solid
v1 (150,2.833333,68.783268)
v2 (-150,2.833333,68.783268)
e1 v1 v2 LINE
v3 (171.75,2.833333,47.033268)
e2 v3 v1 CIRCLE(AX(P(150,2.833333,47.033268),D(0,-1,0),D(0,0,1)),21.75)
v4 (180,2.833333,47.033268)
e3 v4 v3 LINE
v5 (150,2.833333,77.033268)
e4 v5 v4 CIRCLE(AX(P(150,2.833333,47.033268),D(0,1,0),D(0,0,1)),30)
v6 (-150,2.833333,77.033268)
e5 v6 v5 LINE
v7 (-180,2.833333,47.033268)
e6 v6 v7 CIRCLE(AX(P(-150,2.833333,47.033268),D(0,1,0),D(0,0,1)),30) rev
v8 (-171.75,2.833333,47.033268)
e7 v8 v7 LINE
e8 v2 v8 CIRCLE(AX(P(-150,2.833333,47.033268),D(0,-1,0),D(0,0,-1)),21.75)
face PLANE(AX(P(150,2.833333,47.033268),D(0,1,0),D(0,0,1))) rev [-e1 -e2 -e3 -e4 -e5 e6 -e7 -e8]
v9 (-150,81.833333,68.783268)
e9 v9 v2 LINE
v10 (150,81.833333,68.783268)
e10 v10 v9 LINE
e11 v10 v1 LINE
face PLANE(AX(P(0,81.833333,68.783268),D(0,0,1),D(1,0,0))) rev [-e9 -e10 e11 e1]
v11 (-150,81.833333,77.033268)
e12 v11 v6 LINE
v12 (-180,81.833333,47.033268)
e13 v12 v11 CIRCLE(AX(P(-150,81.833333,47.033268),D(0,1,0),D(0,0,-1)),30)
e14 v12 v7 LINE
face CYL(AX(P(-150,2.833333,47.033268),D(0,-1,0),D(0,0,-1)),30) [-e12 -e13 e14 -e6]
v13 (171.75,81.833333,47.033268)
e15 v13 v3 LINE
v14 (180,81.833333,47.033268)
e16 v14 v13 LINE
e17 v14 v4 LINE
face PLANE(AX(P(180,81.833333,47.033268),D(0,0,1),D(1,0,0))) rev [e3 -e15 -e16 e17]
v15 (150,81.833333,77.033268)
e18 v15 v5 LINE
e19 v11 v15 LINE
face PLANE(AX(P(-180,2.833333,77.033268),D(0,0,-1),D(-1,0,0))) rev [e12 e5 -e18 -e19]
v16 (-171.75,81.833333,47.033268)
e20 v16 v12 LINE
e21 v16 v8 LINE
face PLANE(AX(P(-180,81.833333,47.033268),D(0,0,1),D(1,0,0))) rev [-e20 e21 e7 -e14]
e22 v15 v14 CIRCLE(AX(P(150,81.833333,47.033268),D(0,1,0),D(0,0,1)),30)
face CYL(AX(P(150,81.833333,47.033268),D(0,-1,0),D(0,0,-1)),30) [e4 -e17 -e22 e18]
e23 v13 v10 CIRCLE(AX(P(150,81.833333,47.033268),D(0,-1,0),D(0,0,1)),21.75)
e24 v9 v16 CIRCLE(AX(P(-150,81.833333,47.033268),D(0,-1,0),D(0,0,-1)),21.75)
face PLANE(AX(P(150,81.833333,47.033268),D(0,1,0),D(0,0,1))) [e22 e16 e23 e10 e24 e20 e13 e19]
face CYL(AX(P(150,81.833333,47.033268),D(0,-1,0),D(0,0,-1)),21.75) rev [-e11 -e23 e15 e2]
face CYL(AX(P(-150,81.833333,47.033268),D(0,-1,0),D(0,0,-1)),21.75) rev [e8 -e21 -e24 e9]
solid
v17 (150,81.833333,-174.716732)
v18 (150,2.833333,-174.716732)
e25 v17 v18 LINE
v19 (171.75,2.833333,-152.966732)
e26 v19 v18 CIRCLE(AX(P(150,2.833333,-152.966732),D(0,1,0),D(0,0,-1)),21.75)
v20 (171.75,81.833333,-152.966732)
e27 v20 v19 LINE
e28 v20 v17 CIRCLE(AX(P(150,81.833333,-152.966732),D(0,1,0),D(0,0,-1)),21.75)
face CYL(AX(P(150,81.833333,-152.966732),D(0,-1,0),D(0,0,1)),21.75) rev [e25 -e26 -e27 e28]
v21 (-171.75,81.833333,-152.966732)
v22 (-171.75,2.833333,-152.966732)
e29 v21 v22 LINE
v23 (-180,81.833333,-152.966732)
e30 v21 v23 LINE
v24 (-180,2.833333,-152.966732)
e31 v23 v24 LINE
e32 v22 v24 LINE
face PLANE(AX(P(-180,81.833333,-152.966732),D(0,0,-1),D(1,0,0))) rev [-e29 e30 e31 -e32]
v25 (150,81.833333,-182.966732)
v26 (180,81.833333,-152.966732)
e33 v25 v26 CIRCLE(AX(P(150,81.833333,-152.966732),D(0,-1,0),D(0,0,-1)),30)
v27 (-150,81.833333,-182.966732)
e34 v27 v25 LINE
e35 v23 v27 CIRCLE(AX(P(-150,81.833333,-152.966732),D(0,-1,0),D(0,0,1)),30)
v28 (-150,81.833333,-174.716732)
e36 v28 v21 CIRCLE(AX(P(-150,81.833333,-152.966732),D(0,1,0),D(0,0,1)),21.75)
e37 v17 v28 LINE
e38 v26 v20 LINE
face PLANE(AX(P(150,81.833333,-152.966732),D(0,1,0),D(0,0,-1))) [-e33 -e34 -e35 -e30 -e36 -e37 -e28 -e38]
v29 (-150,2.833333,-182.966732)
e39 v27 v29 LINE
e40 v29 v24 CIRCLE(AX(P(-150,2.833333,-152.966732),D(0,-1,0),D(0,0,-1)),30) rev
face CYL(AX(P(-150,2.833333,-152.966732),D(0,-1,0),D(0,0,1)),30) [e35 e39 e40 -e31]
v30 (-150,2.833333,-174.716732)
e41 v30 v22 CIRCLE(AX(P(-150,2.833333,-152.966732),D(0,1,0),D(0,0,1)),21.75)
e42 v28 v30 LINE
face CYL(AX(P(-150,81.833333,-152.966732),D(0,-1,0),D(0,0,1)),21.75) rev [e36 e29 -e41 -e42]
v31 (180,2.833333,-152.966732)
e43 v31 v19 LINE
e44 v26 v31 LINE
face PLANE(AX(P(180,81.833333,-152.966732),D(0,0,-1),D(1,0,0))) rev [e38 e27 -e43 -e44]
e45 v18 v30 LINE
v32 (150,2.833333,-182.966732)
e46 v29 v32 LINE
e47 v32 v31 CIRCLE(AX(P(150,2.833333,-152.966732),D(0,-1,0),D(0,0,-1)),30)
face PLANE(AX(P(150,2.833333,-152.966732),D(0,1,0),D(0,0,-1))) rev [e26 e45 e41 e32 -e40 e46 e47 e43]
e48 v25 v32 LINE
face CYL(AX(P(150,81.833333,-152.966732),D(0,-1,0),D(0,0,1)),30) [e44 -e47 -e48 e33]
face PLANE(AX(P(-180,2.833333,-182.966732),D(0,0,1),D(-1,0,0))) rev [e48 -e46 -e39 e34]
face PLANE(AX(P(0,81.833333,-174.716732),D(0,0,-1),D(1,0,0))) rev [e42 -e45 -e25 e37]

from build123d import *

# Parameters (mm, degrees)
BOSS_EXTRUDE1_DEPTH      = 16
BOSS_EXTRUDE2_DEPTH      = 46.583974855
BOSS_EXTRUDE2_DEPTH_BACK = 46.58397486
SKETCH4_R                = 3.3
CUT_EXTRUDE1_DEPTH       = 32.2
CUT_EXTRUDE1_DEPTH_BACK  = 32.2
SKETCH5_R                = 3.3
SKETCH6_W                = 20
SKETCH6_H                = 11
BOSS_EXTRUDE3_DEPTH      = 30
CUT_EXTRUDE2_DEPTH       = 233.824504724
CUT_EXTRUDE2_DEPTH_BACK  = 233.824504724
SKETCH7_R                = 2
SKETCH8_W                = 40
SKETCH8_H                = 11
CUT_EXTRUDE3_DEPTH       = 40
SKETCH9_R                = 2
CUT_EXTRUDE4_DEPTH       = 40
FILLET1_R                = 20
BOSS_EXTRUDE4_DEPTH      = 52.66666667
SKETCH11_W               = 287.599331825
SKETCH11_H               = 200.78083169
CUT_EXTRUDE5_DEPTH       = 16
SCALE1_START             = 16
SCALE1_DEPTH             = 52.66666667
SCALE1_START_2           = 2.833333333
SCALE1_2_DEPTH           = 79.000000004
SKETCH15_W               = 527.18296214
SKETCH15_H               = 284.392361206
CUT_EXTRUDE9_DEPTH       = 200


# Read off the part's stored shape, not the designer's step: Scale1
with BuildPart() as part:
    # Sketch1 → Boss-Extrude1 (new body)
    with BuildSketch(Plane(origin=(0, 0, 0), x_dir=(1, 0, 0), z_dir=(0, 1, 0))):
        Polygon((-120, -37.5), (-120, -75), (0, -75), (0, 75), (-120, 75), (-120, 37.5), (-220, 37.5), (-220, -37.5), align=None)
    extrude(amount=BOSS_EXTRUDE1_DEPTH)

    # Sketch4 → Boss-Extrude2 (add, two sides: drawn at the far end of the back side and taken through both)
    # profile 1 of 2: a face of its own
    with BuildSketch(Plane.ZY.offset(170).offset(-BOSS_EXTRUDE2_DEPTH_BACK)):
        with BuildLine():
            Line((37.5, 16), (43.5, 16))
            ThreePointArc((43.5, 16), (51.5, 8), (43.5, 0))
            Line((43.5, 0), (37.5, 0))
            Line((37.5, 0), (37.5, 16))
        make_face()
        with Locations((43.5, 8)):
            Circle(SKETCH4_R, mode=Mode.SUBTRACT)
    # profile 2 of 2: a face of its own
    with BuildSketch(Plane.ZY.offset(170).offset(-BOSS_EXTRUDE2_DEPTH_BACK)):
        with BuildLine():
            Line((-37.5, 0), (-43.5, 0))
            ThreePointArc((-43.5, 0), (-51.5, 8), (-43.5, 16))
            Line((-43.5, 16), (-37.5, 16))
            Line((-37.5, 16), (-37.5, 0))
        make_face()
        with Locations((-43.5, 8)):
            Circle(SKETCH4_R, mode=Mode.SUBTRACT)
    extrude(amount=BOSS_EXTRUDE2_DEPTH + BOSS_EXTRUDE2_DEPTH_BACK)

    # Sketch5 → Cut-Extrude1 (cut, two sides: drawn at the far end of the back side and taken through both)
    # profile 1 of 2: a face of its own
    with BuildSketch(Plane.ZY.offset(170).offset(-CUT_EXTRUDE1_DEPTH_BACK)):
        with BuildLine():
            Line((-43.5, 16), (-37.5, 16))
            Line((-37.5, 16), (-37.5, 0))
            Line((-37.5, 0), (-43.5, 0))
            ThreePointArc((-43.5, 0), (-51.5, 8), (-43.5, 16))
        make_face()
        with Locations((-43.5, 8)):
            Circle(SKETCH5_R, mode=Mode.SUBTRACT)
    # profile 2 of 2: a face of its own
    with BuildSketch(Plane.ZY.offset(170).offset(-CUT_EXTRUDE1_DEPTH_BACK)):
        with BuildLine():
            Line((37.5, 0), (43.5, 0))
            ThreePointArc((43.5, 0), (51.5, 8), (43.5, 16))
            Line((43.5, 16), (37.5, 16))
            Line((37.5, 16), (37.5, 0))
        make_face()
        with Locations((43.5, 8)):
            Circle(SKETCH5_R, mode=Mode.SUBTRACT)
    extrude(amount=CUT_EXTRUDE1_DEPTH + CUT_EXTRUDE1_DEPTH_BACK, mode=Mode.SUBTRACT)

    # Sketch6 → Boss-Extrude3 (add)
    with BuildSketch(Plane(origin=(0, 0, 0), x_dir=(0, 0, -1), z_dir=(1, 0, 0))):
        with Locations((-50, 8)):
            Rectangle(SKETCH6_W, SKETCH6_H)
        with Locations((50, 8)):
            Rectangle(SKETCH6_W, SKETCH6_H)
    extrude(amount=BOSS_EXTRUDE3_DEPTH)

    # Sketch7 → Cut-Extrude2 (cut, two sides: drawn at the far end of the back side and taken through both)
    with BuildSketch(Plane(origin=(0, 13.5, 0), x_dir=(1, 0, 0), z_dir=(0, 1, 0)).offset(-CUT_EXTRUDE2_DEPTH_BACK)):
        with Locations(Location((22.5, 50, 0), (0, 0, 270))):
            Circle(SKETCH7_R)
        with Locations(Location((22.5, -50, 0), (0, 0, 270))):
            Circle(SKETCH7_R)
    extrude(amount=CUT_EXTRUDE2_DEPTH + CUT_EXTRUDE2_DEPTH_BACK, mode=Mode.SUBTRACT)

    # Sketch8 → Cut-Extrude3 (cut)
    with BuildSketch(Plane(origin=(0, 0, 0), x_dir=(0, 0, -1), z_dir=(1, 0, 0))):
        with Locations((0, 8)):
            Rectangle(SKETCH8_W, SKETCH8_H)
    extrude(amount=-CUT_EXTRUDE3_DEPTH, mode=Mode.SUBTRACT)

    # Sketch9 → Cut-Extrude4 (cut)
    with BuildSketch(Plane(origin=(0, 16, 0), x_dir=(1, 0, 0), z_dir=(0, 1, 0))):
        with Locations(Location((-32.5, 0, 0), (0, 0, 270))):
            Circle(SKETCH9_R)
    extrude(amount=-CUT_EXTRUDE4_DEPTH, mode=Mode.SUBTRACT)

    # Fillet1
    # the kernel refuses this fillet: 20 mm, written as the material it takes off along each edge
    with BuildSketch(Plane(origin=(-220, -27.947694226, -37.5), x_dir=(0, 0, 1), z_dir=(0, 1, 0))) as fillet1_piece_1:
        with BuildLine():
            CenterArc((11.17907769, 20), FILLET1_R, 236.01651728, 33.98348272)
            Line((0, 3.416025145), (-0.223581554, 3.084345648))
            ThreePointArc((-0.223581554, 3.084345648), (-0.4, 1.708012572), (-0.4, 0))
            Line((-0.4, 0), (0, -0.4))
            Line((0, -0.4), (11.17907769, -0.4))
            Line((11.17907769, -0.4), (11.17907769, 0))
        make_face()
    extrude(amount=71.895388452, mode=Mode.SUBTRACT)
    with BuildSketch(Plane(origin=(-220, -27.947694226, 37.5), x_dir=(1, 0, 0), z_dir=(0, 1, 0))) as fillet1_piece_2:
        with BuildLine():
            CenterArc((20, 11.17907769), FILLET1_R, 180, 33.98348272)
            Line((0, 11.17907769), (-0.4, 11.17907769))
            Line((-0.4, 11.17907769), (-0.4, 0))
            Line((-0.4, 0), (0, -0.4))
            ThreePointArc((0, -0.4), (1.708012572, -0.4), (3.084345648, -0.223581554))
            Line((3.084345648, -0.223581554), (3.416025145, 0))
        make_face()
    extrude(amount=71.895388452, mode=Mode.SUBTRACT)
    with BuildSketch(Plane(origin=(-120, -50, -75), x_dir=(1, 0, 0), z_dir=(0, 1, 0)), Plane(origin=(-120, -50, 75), x_dir=(0, 0, -1), z_dir=(0, 1, 0))) as fillet1_piece_3:
        with BuildLine():
            CenterArc((FILLET1_R, -FILLET1_R), FILLET1_R, 90, 90)
            Line((0, -FILLET1_R), (-FILLET1_R * 0.02, -FILLET1_R))
            Line((-FILLET1_R * 0.02, -FILLET1_R), (-FILLET1_R * 0.02, FILLET1_R * 0.02))
            Line((-FILLET1_R * 0.02, FILLET1_R * 0.02), (FILLET1_R, FILLET1_R * 0.02))
            Line((FILLET1_R, FILLET1_R * 0.02), (FILLET1_R, 0))
        make_face()
    extrude(amount=116, mode=Mode.SUBTRACT)

    # Sketch10 → Boss-Extrude4 (add)
    with BuildSketch(Plane(origin=(0, 16, 0), x_dir=(1, 0, 0), z_dir=(0, 1, 0))):
        with BuildLine():
            Line((0, 69.5), (-100, 69.5))
            ThreePointArc((-100, 69.5), (-110.253048327, 65.253048327), (-114.5, 55))
            Line((-114.5, 55), (-120, 55))
            ThreePointArc((-120, 55), (-114.142135624, 69.142135624), (-100, 75))
            Line((-100, 75), (0, 75))
            Line((0, 75), (100, 75))
            ThreePointArc((100, 75), (114.142135624, 69.142135624), (120, 55))
            Line((120, 55), (114.5, 55))
            ThreePointArc((114.5, 55), (110.253048327, 65.253048327), (100, 69.5))
            Line((100, 69.5), (0, 69.5))
        make_face()
        with BuildLine():
            Line((0, -75), (100, -75))
            ThreePointArc((100, -75), (114.142135624, -69.142135624), (120, -55))
            Line((120, -55), (114.5, -55))
            ThreePointArc((114.5, -55), (110.253048327, -65.253048327), (100, -69.5))
            Line((100, -69.5), (0, -69.5))
            Line((0, -69.5), (-100, -69.5))
            ThreePointArc((-100, -69.5), (-110.253048327, -65.253048327), (-114.5, -55))
            Line((-114.5, -55), (-120, -55))
            ThreePointArc((-120, -55), (-114.142135624, -69.142135624), (-100, -75))
            Line((-100, -75), (0, -75))
        make_face()
    extrude(amount=BOSS_EXTRUDE4_DEPTH)

    # Sketch11 → Cut-Extrude5 (cut)
    with BuildSketch(Plane.XZ):
        with Locations((-109.164099046, 3.949352656)):
            Rectangle(SKETCH11_W, SKETCH11_H)
    extrude(amount=-CUT_EXTRUDE5_DEPTH, mode=Mode.SUBTRACT)


with BuildPart() as cut_extrude5_piece_1:
    # of the separate pieces the step leaves, piece 1, a body of its own (cut_extrude5_pieces)
    add(part.part.solids().sort_by_distance((-100, 16, 75))[0])


with BuildPart() as cut_extrude5_piece_2:
    # of the separate pieces the step leaves, piece 2, a body of its own (cut_extrude5_pieces)
    add(part.part.solids().sort_by_distance((-114.5, 16, -55))[0])


with BuildPart() as scale1_tool:
    # Scale1 outline → Scale1 (new body)
    with BuildSketch(Plane(origin=(0, 0, 0), x_dir=(1, 0, 0), z_dir=(0, 1, 0)).offset(SCALE1_START)):
        with BuildLine():
            Line((104.502391105, -68.783267912), (114.492119434, -68.783267912))
            ThreePointArc((114.492119434, -68.783267912), (118.572054123, -62.421509662), (120, -55))
            Line((120, -55), (114.5, -55))
            ThreePointArc((114.5, -55), (111.737433088, -63.513675146), (104.502391105, -68.783267912))
        make_face()
        with BuildLine():
            Line((-114.492119434, -68.783267912), (-104.502391105, -68.783267912))
            ThreePointArc((-104.502391105, -68.783267912), (-111.737433088, -63.513675146), (-114.5, -55))
            Line((-114.5, -55), (-120, -55))
            ThreePointArc((-120, -55), (-118.572054123, -62.421509662), (-114.492119434, -68.783267912))
        make_face()
        with BuildLine():
            Line((-104.502391105, 68.783267912), (-114.492119434, 68.783267912))
            ThreePointArc((-114.492119434, 68.783267912), (-118.572054123, 62.421509662), (-120, 55))
            Line((-120, 55), (-114.5, 55))
            ThreePointArc((-114.5, 55), (-111.737433088, 63.513675146), (-104.502391105, 68.783267912))
        make_face()
        with BuildLine():
            ThreePointArc((120, 55), (118.572054123, 62.421509662), (114.492119434, 68.783267912))
            Line((114.492119434, 68.783267912), (104.502391105, 68.783267912))
            ThreePointArc((104.502391105, 68.783267912), (111.737433088, 63.513675146), (114.5, 55))
            Line((114.5, 55), (120, 55))
        make_face()
    extrude(amount=SCALE1_DEPTH)


with BuildPart() as cut_extrude5_piece_1_1:
    add(cut_extrude5_piece_1.part)

    # Scale1: cut by scale1_tool
    add(scale1_tool.part, mode=Mode.SUBTRACT)



with BuildPart() as cut_extrude5_piece_2_1:
    add(cut_extrude5_piece_2.part)

    # Scale1: cut by scale1_tool
    add(scale1_tool.part, mode=Mode.SUBTRACT)


with BuildPart() as cut_extrude5_piece_1_2:
    add(cut_extrude5_piece_1_1.part)

    add(cut_extrude5_piece_2_1.part)  # Scale1 2 merges Cut-Extrude5 piece 2
    # Scale1 2 outline → Scale1 2 (add)
    with BuildSketch(Plane(origin=(0, 0, 0), x_dir=(1, 0, 0), z_dir=(0, 1, 0)).offset(SCALE1_START_2)):
        with BuildLine():
            Line((180, -47.033267912), (171.75, -47.033267912))
            ThreePointArc((171.75, -47.033267912), (165.379572491, -62.412840403), (150, -68.783267912))
            Line((150, -68.783267912), (-150, -68.783267912))
            ThreePointArc((-150, -68.783267912), (-165.379572491, -62.412840403), (-171.75, -47.033267912))
            Line((-171.75, -47.033267912), (-180, -47.033267912))
            ThreePointArc((-180, -47.033267912), (-171.213203436, -68.246471348), (-150, -77.033267912))
            Line((-150, -77.033267912), (150, -77.033267912))
            ThreePointArc((150, -77.033267912), (171.213203436, -68.246471348), (180, -47.033267912))
        make_face()
        with BuildLine():
            Line((150, 77.033267912), (-150, 77.033267912))
            ThreePointArc((-150, 77.033267912), (-171.213203436, 68.246471348), (-180, 47.033267912))
            Line((-180, 47.033267912), (-171.75, 47.033267912))
            ThreePointArc((-171.75, 47.033267912), (-165.379572491, 62.412840403), (-150, 68.783267912))
            Line((-150, 68.783267912), (150, 68.783267912))
            ThreePointArc((150, 68.783267912), (165.379572491, 62.412840403), (171.75, 47.033267912))
            Line((171.75, 47.033267912), (180, 47.033267912))
            ThreePointArc((180, 47.033267912), (171.213203436, 68.246471348), (150, 77.033267912))
        make_face()
    extrude(amount=SCALE1_2_DEPTH)

    # Sketch15 → Cut-Extrude9 (cut)
    with BuildSketch(Plane.XY):
        with Locations((-4.944471508, 47.534491158)):
            Rectangle(SKETCH15_W, SKETCH15_H)
    extrude(amount=-CUT_EXTRUDE9_DEPTH, mode=Mode.SUBTRACT)


with BuildPart() as body_2:
    # Mirror8: mirrored copy
    add(cut_extrude5_piece_1_2.part.mirror(Plane.XY.offset(-52.966732088)))


solid = Compound([cut_extrude5_piece_1_2.part, body_2.part])
